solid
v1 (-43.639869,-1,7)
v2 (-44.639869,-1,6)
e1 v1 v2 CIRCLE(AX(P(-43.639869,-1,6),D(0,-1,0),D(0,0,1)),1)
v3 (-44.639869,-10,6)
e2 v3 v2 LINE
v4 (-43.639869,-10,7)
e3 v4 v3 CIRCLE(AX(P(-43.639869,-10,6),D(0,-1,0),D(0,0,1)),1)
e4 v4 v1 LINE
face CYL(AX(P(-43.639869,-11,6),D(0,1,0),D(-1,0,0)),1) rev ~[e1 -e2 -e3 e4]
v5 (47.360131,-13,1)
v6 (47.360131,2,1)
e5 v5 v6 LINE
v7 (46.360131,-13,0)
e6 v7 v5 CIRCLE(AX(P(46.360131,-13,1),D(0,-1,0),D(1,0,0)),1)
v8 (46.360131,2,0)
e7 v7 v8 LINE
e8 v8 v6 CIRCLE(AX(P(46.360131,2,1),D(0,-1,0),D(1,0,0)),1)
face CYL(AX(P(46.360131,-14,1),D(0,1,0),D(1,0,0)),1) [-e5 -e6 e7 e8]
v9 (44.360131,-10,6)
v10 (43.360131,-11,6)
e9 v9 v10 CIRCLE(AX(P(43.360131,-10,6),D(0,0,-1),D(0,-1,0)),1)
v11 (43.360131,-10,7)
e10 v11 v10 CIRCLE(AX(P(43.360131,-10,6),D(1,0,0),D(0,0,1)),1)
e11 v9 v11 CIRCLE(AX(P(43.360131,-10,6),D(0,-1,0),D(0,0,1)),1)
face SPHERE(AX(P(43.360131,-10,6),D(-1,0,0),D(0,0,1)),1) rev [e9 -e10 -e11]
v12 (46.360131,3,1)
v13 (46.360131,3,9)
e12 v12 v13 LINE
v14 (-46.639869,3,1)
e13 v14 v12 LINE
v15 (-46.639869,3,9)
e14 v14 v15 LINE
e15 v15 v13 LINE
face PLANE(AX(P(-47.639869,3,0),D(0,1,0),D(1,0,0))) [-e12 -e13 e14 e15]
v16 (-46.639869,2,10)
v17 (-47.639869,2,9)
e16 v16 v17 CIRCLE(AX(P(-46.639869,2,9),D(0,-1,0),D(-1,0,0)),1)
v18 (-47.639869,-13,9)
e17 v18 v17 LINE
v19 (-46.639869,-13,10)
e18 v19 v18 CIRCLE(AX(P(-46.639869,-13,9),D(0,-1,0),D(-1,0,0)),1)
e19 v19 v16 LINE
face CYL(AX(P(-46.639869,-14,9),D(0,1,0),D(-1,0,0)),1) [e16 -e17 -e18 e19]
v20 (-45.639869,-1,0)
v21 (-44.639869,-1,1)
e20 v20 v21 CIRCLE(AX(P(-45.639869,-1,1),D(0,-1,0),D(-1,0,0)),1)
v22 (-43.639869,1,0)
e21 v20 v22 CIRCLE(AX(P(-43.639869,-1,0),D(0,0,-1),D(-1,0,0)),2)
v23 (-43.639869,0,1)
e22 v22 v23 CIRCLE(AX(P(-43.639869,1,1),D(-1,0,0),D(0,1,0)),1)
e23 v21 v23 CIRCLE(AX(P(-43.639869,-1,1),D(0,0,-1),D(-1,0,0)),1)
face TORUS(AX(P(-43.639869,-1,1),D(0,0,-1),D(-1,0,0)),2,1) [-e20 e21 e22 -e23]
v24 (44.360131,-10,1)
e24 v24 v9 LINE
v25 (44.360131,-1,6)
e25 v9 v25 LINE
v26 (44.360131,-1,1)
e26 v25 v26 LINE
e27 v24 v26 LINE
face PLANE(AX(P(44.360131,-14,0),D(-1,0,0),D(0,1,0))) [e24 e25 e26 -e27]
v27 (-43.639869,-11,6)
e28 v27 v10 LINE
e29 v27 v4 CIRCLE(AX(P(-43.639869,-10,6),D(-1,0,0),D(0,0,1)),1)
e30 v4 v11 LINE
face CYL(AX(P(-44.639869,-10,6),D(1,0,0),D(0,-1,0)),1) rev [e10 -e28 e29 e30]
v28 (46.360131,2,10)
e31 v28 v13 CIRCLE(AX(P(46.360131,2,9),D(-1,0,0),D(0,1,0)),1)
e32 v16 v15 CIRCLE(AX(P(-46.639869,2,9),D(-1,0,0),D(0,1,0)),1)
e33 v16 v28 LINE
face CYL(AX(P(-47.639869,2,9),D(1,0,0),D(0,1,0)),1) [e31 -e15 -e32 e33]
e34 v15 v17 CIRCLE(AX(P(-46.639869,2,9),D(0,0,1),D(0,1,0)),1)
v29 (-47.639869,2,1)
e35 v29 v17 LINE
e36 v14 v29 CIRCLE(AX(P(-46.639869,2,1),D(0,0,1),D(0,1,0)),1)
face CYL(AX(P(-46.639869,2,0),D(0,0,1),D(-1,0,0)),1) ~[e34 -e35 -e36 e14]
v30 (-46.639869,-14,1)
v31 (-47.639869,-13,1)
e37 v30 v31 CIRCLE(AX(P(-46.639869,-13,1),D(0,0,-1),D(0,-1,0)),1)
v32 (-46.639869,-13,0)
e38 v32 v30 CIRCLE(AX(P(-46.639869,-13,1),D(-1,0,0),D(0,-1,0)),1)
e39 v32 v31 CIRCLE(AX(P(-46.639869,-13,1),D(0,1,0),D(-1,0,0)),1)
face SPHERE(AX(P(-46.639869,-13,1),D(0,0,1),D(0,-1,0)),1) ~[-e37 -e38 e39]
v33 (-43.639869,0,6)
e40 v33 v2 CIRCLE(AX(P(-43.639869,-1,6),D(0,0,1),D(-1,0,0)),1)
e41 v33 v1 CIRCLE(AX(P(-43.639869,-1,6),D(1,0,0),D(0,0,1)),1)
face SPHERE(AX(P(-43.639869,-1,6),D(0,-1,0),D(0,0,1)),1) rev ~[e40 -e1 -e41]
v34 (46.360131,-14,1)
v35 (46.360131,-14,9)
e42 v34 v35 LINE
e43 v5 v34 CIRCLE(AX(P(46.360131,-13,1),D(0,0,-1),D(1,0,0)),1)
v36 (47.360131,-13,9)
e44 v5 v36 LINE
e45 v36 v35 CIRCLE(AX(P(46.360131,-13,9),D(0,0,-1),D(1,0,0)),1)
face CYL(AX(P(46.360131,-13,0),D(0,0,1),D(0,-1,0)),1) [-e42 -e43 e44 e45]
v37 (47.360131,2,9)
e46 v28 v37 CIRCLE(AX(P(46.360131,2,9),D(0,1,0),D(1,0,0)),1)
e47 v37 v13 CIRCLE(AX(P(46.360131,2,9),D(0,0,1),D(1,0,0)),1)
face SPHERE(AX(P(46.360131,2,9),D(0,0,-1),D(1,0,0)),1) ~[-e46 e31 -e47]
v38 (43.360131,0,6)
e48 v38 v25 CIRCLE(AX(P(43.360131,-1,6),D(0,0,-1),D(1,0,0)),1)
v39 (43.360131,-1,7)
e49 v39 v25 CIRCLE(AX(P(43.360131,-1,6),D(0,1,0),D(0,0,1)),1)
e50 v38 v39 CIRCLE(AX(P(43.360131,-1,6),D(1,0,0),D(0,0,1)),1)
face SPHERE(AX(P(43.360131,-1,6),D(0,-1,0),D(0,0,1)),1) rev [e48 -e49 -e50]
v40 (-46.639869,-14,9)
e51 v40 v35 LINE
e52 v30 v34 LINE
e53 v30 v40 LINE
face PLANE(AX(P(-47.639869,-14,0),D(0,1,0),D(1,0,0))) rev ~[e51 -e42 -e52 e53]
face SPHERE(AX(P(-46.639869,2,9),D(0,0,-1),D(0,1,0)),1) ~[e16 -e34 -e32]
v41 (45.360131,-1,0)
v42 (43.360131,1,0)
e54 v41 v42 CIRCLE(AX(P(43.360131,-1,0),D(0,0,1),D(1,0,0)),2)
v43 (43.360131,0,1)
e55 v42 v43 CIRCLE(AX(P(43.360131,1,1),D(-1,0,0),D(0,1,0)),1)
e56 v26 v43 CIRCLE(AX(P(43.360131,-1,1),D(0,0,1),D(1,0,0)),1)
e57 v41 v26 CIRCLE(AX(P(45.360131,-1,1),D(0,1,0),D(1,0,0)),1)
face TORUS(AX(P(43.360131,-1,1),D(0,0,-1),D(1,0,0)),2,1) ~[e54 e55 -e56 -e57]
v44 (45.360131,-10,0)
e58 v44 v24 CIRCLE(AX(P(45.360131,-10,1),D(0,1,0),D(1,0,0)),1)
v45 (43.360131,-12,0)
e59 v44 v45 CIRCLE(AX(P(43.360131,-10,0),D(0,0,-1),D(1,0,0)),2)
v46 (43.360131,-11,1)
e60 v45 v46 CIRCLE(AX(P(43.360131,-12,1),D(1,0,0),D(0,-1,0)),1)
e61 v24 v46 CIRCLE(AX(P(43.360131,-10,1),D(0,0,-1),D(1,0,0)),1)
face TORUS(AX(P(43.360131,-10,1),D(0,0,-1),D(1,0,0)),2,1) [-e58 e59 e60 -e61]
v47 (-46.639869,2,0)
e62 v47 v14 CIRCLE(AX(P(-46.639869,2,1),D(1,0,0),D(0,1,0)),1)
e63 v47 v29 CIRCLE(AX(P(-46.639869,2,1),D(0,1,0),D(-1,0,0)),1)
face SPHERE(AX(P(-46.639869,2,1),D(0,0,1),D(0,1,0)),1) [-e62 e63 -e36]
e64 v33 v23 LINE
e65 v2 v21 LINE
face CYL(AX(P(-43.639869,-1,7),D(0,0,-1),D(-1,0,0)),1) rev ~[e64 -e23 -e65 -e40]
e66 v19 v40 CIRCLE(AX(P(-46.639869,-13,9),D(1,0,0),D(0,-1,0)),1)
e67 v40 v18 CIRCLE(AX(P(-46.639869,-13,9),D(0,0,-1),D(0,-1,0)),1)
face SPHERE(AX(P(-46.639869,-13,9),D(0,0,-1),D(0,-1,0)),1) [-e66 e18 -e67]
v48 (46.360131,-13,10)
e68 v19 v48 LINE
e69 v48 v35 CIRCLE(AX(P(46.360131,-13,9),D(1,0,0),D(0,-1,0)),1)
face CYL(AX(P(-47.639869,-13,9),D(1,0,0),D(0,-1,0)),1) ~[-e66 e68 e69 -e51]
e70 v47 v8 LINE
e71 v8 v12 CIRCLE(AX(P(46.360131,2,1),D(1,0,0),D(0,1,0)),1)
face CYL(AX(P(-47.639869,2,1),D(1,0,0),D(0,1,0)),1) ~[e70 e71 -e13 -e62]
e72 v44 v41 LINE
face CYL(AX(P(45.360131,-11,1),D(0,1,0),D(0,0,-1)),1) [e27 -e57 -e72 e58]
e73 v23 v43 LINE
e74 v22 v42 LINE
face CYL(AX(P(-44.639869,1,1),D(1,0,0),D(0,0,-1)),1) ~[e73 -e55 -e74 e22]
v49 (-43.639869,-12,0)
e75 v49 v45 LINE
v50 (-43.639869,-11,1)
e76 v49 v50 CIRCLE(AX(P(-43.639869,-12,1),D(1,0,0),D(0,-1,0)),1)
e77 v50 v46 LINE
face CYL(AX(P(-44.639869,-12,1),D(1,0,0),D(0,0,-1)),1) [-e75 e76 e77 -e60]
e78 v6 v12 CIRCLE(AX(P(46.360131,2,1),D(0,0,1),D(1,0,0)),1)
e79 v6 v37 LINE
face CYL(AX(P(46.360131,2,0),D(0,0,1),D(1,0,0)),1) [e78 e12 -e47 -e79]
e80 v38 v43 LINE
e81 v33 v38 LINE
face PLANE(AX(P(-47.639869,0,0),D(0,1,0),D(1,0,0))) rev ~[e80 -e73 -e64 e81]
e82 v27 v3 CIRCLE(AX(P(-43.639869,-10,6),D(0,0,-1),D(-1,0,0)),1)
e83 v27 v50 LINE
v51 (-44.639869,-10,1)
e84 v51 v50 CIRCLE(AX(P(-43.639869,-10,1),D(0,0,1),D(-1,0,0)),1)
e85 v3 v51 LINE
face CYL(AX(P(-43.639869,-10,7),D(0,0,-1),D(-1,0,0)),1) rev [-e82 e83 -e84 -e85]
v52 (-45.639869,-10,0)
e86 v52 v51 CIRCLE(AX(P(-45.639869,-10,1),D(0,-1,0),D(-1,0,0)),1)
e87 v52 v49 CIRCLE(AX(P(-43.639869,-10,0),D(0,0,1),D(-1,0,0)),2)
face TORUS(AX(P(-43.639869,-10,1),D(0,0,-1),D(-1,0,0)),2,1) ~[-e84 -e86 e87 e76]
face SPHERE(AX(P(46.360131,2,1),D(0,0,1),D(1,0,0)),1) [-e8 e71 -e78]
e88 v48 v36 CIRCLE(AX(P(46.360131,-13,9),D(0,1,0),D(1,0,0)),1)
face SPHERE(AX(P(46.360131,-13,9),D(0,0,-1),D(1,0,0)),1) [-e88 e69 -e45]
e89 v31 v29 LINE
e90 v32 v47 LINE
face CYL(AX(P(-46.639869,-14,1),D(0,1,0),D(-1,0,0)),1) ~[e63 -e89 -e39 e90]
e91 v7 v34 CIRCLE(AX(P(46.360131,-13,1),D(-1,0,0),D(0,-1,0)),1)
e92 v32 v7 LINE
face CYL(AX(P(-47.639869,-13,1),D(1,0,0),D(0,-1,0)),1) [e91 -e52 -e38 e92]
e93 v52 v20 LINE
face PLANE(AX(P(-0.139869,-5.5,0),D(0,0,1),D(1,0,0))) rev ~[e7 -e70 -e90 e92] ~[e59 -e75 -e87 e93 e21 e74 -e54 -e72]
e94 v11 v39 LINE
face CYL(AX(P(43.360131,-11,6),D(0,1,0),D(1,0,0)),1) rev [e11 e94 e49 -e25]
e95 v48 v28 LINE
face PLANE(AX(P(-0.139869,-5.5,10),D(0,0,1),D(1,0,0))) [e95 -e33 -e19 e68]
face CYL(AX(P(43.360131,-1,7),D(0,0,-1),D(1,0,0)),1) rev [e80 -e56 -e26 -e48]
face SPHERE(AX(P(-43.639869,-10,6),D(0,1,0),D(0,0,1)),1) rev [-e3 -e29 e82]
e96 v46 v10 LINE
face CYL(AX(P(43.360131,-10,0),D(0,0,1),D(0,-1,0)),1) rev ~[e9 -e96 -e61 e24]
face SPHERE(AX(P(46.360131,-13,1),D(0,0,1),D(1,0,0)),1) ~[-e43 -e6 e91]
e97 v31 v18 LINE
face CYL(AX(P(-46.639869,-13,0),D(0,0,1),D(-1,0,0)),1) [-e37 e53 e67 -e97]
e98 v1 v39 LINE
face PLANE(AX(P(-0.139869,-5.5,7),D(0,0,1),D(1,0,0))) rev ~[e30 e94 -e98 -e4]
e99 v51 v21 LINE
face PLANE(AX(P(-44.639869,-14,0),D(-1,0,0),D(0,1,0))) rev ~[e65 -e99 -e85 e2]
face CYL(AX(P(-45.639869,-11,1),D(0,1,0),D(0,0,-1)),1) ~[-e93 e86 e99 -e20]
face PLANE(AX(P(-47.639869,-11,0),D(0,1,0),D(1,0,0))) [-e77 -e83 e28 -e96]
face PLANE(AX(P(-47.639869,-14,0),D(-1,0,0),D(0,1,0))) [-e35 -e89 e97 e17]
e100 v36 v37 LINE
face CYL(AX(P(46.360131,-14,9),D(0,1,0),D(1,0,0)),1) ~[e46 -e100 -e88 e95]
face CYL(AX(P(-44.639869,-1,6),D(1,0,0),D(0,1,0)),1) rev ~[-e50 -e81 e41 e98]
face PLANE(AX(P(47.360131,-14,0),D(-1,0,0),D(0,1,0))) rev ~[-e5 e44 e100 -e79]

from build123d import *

# Parameters (mm, degrees)
F0_W     = 95
F0_H     = 17
F1_DEPTH = 10
F2_T     = -3
F3_R     = 1


with BuildPart() as f1:
    # F0 (on Top) → F1 (new body)
    with BuildSketch(Plane.XY):
        with Locations((-0.1398691535, -5.5)):
            Rectangle(F0_W, F0_H)
    extrude(amount=F1_DEPTH)

    # F2
    f2_openings = [f1.faces().sort_by_distance(p)[0] for p in [
        (-0.139869, -5.5, 0),
    ]]
    offset(amount=F2_T, openings=f2_openings)

    # F3
    f3_edges = [f1.edges().sort_by_distance(p)[0] for p in [
        (-44.639869, -5.5, 7),
        (-0.139869, -11, 7),
        (44.360131, -5.5, 7),
        (-0.139869, 0, 7),
        (-0.139869, 0, 0),
        (44.360131, 0, 3.5),
        (-44.639869, 0, 3.5),
        (-0.139869, -11, 0),
        (-44.639869, -11, 3.5),
        (44.360131, -11, 3.5),
        (47.360131, -14, 5),
        (47.360131, 3, 5),
        (47.360131, -5.5, 0),
        (47.360131, -5.5, 10),
        (-47.639869, -14, 5),
        (-0.139869, -14, 0),
        (-0.139869, -14, 10),
        (-47.639869, 3, 5),
        (-0.139869, 3, 0),
        (-0.139869, 3, 10),
        (-47.639869, -5.5, 0),
        (-47.639869, -5.5, 10),
        (44.360131, -5.5, 0),
        (-44.639869, -5.5, 0),
    ]]
    fillet(f3_edges, radius=F3_R)


solid = f1.part
